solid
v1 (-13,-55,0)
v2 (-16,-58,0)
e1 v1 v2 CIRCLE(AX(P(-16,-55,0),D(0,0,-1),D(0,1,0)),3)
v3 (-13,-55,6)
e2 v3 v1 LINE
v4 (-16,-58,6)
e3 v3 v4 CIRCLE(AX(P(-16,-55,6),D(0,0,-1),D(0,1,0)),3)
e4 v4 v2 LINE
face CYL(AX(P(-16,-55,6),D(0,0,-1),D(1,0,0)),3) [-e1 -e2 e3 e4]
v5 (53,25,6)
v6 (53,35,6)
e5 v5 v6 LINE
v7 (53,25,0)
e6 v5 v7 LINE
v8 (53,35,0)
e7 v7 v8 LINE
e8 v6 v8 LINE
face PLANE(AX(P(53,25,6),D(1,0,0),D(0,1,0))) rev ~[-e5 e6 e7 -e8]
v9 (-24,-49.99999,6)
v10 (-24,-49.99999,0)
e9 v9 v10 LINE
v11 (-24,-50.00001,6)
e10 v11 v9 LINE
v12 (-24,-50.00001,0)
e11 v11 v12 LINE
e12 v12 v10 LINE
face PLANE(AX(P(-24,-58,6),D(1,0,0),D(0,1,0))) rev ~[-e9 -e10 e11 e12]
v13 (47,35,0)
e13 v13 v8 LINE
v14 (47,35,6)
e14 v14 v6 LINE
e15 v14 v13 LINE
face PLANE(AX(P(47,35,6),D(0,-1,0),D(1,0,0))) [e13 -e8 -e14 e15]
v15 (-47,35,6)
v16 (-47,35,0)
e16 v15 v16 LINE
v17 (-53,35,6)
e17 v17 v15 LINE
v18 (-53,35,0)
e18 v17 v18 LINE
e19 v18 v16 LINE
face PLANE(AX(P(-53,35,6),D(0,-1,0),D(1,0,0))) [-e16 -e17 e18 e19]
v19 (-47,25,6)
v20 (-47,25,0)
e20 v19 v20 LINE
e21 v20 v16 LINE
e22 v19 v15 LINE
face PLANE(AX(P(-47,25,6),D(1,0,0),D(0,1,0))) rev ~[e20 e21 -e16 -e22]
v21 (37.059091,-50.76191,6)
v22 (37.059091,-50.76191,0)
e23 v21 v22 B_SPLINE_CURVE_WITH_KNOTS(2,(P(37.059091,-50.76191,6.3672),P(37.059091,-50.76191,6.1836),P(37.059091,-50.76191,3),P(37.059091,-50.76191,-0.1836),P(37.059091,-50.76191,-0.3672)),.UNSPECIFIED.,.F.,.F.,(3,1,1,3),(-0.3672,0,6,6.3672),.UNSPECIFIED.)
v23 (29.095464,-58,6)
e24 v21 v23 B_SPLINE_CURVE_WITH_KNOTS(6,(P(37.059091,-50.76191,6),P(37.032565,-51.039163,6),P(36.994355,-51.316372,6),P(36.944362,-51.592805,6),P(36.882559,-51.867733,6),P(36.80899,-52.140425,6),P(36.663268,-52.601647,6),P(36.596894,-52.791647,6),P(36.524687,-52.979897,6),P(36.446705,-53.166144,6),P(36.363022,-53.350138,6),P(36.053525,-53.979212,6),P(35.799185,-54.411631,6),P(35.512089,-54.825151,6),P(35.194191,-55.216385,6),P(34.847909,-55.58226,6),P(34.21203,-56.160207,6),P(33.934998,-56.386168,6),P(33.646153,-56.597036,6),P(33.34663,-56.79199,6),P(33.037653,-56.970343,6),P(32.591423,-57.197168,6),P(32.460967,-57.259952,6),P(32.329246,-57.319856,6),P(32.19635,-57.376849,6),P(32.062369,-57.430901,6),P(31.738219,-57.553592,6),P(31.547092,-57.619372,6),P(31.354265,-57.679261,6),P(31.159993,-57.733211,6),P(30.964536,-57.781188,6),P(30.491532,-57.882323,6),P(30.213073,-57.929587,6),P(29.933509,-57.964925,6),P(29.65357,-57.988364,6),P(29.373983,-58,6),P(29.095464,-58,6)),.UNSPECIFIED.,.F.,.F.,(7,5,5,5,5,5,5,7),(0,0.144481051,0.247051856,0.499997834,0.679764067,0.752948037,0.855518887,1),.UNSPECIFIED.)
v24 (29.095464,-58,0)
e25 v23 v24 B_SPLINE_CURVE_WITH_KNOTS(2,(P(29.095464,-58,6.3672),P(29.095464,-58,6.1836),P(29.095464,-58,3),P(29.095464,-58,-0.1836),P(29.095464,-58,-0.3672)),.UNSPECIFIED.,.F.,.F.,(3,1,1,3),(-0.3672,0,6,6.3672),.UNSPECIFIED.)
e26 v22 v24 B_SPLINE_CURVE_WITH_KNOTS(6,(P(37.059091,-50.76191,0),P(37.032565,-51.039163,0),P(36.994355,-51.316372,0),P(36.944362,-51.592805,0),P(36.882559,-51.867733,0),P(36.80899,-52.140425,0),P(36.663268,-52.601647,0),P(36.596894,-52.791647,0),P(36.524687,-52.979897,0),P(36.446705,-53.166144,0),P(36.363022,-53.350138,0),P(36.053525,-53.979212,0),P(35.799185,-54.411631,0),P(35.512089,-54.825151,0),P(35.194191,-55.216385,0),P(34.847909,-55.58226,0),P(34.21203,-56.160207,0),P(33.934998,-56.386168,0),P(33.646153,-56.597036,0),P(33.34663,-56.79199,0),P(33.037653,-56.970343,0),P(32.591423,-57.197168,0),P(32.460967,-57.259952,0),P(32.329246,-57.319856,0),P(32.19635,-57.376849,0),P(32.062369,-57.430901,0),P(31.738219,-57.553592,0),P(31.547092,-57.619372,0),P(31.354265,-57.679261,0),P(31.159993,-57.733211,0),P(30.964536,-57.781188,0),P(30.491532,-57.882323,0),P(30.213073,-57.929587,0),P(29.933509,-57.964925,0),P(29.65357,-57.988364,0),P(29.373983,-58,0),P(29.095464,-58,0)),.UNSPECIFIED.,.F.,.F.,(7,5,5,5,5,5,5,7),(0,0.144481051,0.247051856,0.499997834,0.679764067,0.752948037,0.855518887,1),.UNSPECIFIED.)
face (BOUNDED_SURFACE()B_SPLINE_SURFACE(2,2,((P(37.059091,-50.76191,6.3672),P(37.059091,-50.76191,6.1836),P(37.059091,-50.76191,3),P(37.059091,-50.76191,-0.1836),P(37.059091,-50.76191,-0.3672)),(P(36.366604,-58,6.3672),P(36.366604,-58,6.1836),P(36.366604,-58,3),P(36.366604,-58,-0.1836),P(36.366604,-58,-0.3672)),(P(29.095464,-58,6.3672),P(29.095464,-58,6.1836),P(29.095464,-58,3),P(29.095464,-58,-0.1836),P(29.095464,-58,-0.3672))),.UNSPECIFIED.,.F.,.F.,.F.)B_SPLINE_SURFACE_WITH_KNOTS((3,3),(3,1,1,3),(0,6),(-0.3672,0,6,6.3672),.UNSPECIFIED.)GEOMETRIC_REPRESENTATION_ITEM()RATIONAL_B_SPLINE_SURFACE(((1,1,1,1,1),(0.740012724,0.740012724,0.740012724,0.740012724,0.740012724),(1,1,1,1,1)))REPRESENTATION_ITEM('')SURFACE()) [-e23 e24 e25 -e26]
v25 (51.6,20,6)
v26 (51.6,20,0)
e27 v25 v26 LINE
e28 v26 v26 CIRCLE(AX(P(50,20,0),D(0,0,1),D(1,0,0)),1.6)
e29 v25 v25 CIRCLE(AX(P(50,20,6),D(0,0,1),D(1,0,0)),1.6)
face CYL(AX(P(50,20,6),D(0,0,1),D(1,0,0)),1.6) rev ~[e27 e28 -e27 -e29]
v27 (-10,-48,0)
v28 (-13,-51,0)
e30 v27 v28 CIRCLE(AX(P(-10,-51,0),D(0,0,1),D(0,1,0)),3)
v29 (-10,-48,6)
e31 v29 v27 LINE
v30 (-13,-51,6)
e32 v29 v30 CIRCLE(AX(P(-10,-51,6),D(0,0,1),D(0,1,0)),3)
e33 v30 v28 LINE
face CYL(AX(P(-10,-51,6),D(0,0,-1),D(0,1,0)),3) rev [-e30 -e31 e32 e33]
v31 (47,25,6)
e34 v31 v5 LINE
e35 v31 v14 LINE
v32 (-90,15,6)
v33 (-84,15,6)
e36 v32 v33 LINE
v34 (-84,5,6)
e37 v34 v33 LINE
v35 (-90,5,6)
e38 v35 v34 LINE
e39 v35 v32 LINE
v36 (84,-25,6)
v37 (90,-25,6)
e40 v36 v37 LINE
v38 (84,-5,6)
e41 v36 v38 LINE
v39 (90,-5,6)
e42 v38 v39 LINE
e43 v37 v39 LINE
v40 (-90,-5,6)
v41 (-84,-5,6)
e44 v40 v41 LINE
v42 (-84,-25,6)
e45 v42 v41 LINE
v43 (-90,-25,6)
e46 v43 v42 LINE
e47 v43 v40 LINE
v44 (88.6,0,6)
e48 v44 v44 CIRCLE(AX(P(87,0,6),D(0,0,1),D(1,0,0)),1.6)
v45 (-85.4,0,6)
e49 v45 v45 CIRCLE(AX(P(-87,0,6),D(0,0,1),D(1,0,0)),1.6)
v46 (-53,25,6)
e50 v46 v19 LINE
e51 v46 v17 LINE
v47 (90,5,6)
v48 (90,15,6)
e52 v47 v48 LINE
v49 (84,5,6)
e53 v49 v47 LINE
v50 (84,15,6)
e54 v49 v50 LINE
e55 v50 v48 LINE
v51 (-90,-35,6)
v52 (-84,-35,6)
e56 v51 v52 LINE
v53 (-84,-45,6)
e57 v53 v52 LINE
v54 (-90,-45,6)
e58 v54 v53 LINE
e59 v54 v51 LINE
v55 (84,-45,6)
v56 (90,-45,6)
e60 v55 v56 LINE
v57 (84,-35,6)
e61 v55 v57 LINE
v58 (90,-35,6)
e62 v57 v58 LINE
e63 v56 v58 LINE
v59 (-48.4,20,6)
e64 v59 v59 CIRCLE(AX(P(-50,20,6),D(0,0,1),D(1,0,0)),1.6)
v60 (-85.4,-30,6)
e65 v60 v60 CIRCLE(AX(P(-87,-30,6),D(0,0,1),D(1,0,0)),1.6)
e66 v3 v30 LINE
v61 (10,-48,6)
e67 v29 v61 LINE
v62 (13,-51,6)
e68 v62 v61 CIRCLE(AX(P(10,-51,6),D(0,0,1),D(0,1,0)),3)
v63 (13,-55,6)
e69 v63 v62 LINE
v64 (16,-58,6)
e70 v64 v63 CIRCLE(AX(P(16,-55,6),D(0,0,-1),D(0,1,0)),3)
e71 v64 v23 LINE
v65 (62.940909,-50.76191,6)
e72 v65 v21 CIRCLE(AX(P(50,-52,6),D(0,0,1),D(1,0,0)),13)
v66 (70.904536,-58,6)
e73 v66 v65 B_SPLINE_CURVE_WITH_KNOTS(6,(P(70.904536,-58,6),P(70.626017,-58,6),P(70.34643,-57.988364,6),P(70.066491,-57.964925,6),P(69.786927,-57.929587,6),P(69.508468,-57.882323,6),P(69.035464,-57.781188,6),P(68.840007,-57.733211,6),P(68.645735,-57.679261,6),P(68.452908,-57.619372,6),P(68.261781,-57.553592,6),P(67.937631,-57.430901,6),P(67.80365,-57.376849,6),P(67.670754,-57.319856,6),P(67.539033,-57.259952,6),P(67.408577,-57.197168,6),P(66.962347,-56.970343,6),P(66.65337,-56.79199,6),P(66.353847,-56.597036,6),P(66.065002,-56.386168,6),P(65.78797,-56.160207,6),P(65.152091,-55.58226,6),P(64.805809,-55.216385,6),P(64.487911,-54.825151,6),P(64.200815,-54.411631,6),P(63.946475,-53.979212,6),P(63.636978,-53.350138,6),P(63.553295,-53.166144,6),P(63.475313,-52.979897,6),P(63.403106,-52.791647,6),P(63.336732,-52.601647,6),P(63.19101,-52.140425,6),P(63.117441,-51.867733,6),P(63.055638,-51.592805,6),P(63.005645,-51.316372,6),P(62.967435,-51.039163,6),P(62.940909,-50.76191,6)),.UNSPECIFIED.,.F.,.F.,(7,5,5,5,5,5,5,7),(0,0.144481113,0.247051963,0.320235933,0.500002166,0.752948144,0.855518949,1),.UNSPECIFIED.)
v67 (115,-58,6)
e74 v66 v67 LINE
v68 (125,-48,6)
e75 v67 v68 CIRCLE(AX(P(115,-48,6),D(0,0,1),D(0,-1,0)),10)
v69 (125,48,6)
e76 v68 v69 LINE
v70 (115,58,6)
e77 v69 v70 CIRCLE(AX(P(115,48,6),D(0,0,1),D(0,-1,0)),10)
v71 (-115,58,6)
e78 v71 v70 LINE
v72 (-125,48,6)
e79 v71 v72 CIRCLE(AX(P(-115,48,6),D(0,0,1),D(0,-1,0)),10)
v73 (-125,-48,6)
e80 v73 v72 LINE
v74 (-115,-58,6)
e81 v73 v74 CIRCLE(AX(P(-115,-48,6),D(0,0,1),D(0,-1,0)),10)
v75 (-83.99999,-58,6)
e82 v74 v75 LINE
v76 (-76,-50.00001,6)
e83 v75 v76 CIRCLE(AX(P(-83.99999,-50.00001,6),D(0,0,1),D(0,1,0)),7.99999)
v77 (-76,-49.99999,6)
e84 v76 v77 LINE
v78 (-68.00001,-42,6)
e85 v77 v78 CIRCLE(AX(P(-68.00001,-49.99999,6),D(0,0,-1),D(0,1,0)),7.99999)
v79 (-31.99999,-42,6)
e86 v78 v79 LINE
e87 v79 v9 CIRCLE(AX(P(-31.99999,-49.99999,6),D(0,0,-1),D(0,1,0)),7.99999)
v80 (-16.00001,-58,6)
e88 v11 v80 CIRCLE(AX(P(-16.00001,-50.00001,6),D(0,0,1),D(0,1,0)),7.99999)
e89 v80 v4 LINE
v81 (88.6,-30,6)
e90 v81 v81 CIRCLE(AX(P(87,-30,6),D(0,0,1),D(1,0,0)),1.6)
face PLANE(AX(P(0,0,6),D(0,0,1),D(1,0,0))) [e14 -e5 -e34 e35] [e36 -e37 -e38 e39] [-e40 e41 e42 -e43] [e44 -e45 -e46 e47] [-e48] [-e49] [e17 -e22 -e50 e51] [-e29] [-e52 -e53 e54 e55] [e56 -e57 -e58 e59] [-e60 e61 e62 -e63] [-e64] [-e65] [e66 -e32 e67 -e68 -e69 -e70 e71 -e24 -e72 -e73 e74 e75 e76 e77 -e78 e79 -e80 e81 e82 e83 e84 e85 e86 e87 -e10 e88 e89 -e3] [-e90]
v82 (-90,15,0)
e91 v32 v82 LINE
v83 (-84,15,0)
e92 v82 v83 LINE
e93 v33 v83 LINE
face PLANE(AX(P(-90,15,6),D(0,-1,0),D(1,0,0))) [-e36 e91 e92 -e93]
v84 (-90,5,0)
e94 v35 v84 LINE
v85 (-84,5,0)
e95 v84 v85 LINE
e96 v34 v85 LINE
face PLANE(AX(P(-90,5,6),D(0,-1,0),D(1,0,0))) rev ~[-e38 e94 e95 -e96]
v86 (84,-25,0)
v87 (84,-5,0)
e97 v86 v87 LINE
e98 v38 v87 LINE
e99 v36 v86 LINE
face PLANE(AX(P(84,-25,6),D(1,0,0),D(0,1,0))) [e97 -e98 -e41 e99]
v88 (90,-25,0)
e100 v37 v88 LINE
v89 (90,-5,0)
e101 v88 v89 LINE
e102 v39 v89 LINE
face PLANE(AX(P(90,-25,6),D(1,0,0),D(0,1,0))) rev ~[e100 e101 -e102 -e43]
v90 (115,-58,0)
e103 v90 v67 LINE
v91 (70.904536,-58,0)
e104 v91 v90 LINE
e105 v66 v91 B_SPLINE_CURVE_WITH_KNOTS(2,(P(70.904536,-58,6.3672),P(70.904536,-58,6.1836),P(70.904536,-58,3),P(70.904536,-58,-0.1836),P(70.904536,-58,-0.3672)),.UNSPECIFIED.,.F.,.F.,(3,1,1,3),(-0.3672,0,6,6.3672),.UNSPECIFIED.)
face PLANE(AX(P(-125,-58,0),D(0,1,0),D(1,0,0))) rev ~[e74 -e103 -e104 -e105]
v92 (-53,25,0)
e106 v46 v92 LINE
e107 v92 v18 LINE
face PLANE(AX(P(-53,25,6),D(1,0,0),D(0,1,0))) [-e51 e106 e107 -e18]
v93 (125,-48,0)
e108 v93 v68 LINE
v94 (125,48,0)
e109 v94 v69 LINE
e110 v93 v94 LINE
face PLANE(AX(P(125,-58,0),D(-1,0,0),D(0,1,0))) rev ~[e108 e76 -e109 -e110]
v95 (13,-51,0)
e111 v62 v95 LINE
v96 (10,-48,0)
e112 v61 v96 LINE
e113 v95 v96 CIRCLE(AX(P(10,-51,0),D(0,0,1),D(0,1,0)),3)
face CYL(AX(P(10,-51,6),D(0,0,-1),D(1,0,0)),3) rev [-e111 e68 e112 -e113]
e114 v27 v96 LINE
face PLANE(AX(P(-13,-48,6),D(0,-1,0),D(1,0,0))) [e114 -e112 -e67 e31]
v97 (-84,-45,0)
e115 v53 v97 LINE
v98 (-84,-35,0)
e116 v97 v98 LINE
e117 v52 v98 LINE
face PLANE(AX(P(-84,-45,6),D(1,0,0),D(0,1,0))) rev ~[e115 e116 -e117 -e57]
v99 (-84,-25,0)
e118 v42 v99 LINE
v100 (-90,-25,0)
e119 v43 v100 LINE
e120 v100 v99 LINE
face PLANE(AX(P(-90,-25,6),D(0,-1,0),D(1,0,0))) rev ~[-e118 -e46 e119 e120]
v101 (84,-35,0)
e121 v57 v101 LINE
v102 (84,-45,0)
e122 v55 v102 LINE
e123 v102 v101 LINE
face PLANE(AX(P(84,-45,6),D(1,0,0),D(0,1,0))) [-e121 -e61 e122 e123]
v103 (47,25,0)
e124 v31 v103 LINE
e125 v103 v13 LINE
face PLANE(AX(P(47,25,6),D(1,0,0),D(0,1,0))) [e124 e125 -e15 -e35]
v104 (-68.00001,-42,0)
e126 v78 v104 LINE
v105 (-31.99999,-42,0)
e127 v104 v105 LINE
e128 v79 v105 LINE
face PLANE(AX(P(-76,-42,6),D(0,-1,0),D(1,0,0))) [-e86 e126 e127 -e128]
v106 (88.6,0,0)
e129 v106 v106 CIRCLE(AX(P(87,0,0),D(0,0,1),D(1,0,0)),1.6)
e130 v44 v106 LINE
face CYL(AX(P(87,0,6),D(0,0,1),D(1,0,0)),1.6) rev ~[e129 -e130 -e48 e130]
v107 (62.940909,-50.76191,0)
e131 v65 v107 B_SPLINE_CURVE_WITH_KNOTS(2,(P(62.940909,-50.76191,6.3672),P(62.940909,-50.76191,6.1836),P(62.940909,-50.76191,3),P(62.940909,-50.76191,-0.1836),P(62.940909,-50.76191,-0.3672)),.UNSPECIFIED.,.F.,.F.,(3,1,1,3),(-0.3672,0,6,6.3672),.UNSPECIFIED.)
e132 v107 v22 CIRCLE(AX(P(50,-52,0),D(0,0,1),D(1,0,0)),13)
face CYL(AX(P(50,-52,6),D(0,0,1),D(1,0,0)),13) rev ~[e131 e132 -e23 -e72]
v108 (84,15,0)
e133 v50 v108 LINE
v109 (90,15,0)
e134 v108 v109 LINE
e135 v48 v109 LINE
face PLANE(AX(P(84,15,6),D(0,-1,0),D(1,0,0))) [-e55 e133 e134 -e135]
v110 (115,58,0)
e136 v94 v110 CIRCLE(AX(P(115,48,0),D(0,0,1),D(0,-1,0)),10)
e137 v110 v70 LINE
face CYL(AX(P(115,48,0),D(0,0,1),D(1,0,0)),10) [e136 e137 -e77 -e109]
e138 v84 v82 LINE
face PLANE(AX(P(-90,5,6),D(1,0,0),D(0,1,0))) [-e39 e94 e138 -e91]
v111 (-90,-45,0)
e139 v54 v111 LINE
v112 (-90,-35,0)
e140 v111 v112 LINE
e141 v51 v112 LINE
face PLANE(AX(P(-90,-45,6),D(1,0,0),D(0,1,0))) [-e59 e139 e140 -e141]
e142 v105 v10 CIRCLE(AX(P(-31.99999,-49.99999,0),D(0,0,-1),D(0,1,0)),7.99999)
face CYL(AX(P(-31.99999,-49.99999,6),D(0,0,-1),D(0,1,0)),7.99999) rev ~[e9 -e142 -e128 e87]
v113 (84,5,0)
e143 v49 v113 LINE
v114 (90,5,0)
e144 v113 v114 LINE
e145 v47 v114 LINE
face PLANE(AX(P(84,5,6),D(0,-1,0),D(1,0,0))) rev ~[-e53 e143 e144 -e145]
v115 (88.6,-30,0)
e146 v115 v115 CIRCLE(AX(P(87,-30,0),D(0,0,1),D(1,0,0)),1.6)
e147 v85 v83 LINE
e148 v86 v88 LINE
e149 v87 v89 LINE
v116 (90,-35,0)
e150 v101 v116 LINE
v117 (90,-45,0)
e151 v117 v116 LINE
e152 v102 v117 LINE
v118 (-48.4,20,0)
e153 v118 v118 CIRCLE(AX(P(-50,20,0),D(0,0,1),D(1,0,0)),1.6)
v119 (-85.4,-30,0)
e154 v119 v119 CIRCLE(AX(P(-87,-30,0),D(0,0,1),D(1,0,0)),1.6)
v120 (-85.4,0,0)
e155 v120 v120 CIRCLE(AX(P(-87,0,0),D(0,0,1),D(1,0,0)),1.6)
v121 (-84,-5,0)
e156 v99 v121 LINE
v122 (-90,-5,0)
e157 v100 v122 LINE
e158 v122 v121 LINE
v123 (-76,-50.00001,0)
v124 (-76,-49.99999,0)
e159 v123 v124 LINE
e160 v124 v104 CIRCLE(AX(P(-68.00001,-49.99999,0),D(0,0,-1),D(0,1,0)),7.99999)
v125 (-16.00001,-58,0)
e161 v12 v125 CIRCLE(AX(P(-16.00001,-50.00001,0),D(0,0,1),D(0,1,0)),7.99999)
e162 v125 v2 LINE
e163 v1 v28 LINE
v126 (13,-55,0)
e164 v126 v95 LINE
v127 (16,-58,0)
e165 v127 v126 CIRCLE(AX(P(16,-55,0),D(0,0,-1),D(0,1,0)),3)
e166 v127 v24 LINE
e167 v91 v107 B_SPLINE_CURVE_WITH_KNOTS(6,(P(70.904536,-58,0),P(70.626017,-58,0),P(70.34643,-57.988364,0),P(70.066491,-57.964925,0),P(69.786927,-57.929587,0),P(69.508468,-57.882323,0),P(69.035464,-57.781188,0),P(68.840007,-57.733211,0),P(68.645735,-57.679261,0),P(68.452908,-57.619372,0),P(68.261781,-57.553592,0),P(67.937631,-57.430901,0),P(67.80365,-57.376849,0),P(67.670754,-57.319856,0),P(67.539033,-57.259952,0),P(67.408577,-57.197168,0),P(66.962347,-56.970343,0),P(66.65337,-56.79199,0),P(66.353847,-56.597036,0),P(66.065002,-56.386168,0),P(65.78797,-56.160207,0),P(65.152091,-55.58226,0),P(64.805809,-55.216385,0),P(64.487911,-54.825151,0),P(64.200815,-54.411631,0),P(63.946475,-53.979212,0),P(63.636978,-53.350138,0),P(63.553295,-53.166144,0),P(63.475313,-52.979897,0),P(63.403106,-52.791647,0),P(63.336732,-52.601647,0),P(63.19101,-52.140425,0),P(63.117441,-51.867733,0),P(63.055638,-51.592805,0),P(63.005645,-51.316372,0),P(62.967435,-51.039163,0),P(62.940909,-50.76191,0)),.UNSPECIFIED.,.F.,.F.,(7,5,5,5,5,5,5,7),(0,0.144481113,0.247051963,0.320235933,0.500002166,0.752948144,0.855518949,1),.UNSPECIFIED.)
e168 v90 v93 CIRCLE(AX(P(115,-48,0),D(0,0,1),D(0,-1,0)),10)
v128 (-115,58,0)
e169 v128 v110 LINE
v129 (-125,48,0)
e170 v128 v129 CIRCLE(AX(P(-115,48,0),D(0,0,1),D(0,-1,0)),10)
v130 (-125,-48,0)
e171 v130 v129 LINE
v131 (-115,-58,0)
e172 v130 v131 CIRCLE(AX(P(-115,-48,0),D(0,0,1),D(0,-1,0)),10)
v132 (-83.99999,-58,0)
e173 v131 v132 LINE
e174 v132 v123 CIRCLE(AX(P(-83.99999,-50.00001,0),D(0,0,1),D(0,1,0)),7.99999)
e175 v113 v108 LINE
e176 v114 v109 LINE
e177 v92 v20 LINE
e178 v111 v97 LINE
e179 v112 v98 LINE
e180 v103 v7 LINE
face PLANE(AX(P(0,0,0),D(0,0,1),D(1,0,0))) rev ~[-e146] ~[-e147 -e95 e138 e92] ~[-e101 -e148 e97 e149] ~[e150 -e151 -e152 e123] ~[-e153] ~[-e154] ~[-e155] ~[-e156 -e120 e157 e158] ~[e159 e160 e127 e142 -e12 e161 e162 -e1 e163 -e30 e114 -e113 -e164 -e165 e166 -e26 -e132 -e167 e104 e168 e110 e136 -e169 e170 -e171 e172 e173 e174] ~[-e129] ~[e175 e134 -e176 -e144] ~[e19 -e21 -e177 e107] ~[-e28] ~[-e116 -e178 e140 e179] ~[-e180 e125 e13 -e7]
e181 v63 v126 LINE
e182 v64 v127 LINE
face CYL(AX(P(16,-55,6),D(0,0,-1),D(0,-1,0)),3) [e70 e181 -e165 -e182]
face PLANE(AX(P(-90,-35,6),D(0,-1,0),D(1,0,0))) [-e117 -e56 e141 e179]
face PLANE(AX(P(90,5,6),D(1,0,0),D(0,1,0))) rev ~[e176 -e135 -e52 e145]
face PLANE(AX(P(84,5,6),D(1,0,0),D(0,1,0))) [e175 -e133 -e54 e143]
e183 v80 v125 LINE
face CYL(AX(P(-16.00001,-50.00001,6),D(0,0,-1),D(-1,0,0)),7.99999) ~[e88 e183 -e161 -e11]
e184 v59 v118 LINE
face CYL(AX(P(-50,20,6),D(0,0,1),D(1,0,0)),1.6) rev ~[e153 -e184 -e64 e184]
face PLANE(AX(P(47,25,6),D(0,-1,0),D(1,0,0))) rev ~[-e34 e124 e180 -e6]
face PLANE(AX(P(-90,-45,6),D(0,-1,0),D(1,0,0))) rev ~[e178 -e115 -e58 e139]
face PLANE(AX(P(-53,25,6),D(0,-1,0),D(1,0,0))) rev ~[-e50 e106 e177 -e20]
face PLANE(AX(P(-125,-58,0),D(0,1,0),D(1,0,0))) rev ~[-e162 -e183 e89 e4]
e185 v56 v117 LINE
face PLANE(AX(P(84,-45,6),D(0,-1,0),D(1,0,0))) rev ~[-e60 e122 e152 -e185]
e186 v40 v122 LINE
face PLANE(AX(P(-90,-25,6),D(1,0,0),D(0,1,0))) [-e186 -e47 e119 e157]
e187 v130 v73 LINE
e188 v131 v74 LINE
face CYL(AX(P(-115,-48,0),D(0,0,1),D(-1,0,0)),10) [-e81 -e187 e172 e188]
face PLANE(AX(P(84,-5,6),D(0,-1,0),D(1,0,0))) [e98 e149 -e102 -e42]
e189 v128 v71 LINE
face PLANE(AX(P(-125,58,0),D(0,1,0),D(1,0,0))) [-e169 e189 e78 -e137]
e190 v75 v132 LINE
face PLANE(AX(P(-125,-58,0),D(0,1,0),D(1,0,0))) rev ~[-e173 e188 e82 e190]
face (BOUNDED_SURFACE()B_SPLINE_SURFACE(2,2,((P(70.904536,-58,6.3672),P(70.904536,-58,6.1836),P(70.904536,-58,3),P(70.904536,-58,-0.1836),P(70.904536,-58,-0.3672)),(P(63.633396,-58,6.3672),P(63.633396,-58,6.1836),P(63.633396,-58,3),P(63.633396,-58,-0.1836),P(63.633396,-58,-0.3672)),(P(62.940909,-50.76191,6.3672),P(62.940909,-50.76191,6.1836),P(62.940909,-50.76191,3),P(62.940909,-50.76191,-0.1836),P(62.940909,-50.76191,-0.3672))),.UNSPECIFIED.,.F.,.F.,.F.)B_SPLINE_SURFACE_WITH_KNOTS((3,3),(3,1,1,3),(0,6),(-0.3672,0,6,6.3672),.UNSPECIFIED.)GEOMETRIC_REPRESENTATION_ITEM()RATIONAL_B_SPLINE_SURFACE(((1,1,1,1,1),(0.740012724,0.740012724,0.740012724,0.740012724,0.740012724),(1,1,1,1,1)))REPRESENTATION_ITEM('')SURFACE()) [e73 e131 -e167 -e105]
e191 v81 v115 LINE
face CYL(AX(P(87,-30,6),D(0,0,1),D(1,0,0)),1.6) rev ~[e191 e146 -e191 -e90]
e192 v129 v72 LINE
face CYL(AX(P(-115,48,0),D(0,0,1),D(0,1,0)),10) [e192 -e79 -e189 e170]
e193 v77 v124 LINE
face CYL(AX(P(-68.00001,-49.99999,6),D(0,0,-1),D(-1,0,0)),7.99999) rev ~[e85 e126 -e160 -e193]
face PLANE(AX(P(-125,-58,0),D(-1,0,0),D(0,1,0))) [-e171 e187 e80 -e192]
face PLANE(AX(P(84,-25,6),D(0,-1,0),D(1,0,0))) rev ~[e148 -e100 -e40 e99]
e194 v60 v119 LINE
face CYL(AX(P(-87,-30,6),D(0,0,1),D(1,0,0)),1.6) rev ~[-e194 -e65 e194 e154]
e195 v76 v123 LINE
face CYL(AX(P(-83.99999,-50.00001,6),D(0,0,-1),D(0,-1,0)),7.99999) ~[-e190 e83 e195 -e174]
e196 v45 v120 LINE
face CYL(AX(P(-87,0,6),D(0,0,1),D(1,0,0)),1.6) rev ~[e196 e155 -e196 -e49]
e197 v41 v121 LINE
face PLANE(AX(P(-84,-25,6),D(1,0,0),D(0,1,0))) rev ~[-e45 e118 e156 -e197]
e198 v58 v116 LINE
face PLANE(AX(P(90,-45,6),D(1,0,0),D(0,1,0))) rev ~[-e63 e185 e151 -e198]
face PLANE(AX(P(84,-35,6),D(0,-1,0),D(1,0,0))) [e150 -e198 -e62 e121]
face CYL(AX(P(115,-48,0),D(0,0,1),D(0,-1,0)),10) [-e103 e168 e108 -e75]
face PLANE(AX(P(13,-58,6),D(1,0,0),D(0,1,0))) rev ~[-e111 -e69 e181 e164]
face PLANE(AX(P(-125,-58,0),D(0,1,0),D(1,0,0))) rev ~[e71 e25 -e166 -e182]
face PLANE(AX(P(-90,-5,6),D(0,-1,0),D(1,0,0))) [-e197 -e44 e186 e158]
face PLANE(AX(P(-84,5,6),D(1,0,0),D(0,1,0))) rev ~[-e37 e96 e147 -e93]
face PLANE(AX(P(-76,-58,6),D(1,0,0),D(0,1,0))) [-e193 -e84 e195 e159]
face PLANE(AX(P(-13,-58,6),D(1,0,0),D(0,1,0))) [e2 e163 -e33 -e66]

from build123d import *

# Parameters (mm, degrees)
F0_W     = 250
F0_H     = 116
F1_DEPTH = 6
F2_W     = 6
F2_H     = 10
F2_H_2   = 20
F2_W_2   = 26
F2_R     = 1.6
F2_W_3   = 52
F2_H_3   = 16
F3_DEPTH = 6.001
F4_R     = 3
F5_R     = 10
F6_R     = 7.99999
F7_R     = 1.6
F7_W     = 6
F7_H     = 10
F8_DEPTH = 6.0010001


# Not quite as in the source:
# - a fillet or chamfer is up to 0.001 mm smaller than in the source, because OpenCascade refuses the exact size


with BuildPart() as f1:
    # F0 (on Top) → F1 (new body)
    with BuildSketch(Plane.XY):
        Rectangle(F0_W, F0_H)
    extrude(amount=F1_DEPTH)

    # F2 (on face) → F3 (cut, through all)
    with BuildSketch(Plane.XY.offset(6)):
        with Locations((-87, -40)):
            Rectangle(F2_W, F2_H)
        with Locations((-87, 10)):
            Rectangle(F2_W, F2_H)
        with Locations((87, -40)):
            Rectangle(F2_W, F2_H)
        with Locations((87, 10)):
            Rectangle(F2_W, F2_H)
        with Locations((-87, -15)):
            Rectangle(F2_W, F2_H_2)
        with Locations((87, -15)):
            Rectangle(F2_W, F2_H_2)
        with Locations((0, -53)):
            Rectangle(F2_W_2, F2_H)
        with Locations((-87, -30)):
            Circle(F2_R)
        with Locations((-87, 0)):
            Circle(F2_R)
        with Locations((87, -30)):
            Circle(F2_R)
        with Locations((87, 0)):
            Circle(F2_R)
        with BuildLine():
            Line((37, -58), (63, -58))
            Line((63, -58), (63, -52))
            ThreePointArc((63, -52), (50, -39), (37, -52))
            Line((37, -52), (37, -58))
        make_face()
        with Locations((-50, -50)):
            Rectangle(F2_W_3, F2_H_3)
    extrude(amount=-F3_DEPTH, mode=Mode.SUBTRACT)

    # F4
    f4_edges = [f1.edges().sort_by_distance(p)[0] for p in [
        (-13, -48, 3),
        (13, -48, 3),
        (-13, -58, 3),
        (13, -58, 3),
    ]]
    fillet(f4_edges, radius=F4_R)

    # F5
    f5_edges = [f1.edges().sort_by_distance(p)[0] for p in [
        (-125, -58, 3),
        (125, -58, 3),
        (125, 58, 3),
        (-125, 58, 3),
    ]]
    fillet(f5_edges, radius=F5_R)

    # F6 (radius 8 in the source; OpenCascade refuses exactly that, so slightly less here)
    f6_edges = [f1.edges().sort_by_distance(p)[0] for p in [
        (37, -58, 3),
        (63, -58, 3),
        (-24, -58, 3),
        (-24, -42, 3),
        (-76, -42, 3),
        (-76, -58, 3),
    ]]
    fillet(f6_edges, radius=F6_R)

    # F7 (on face) → F8 (cut, through all)
    with BuildSketch(Plane.XY.offset(6)):
        with Locations((-50, 20)):
            Circle(F7_R)
        with Locations((-50, 30)):
            Rectangle(F7_W, F7_H)
        with Locations((50, 30)):
            Rectangle(F7_W, F7_H)
        with Locations((50, 20)):
            Circle(F7_R)
    extrude(amount=-F8_DEPTH, mode=Mode.SUBTRACT)


solid = f1.part
